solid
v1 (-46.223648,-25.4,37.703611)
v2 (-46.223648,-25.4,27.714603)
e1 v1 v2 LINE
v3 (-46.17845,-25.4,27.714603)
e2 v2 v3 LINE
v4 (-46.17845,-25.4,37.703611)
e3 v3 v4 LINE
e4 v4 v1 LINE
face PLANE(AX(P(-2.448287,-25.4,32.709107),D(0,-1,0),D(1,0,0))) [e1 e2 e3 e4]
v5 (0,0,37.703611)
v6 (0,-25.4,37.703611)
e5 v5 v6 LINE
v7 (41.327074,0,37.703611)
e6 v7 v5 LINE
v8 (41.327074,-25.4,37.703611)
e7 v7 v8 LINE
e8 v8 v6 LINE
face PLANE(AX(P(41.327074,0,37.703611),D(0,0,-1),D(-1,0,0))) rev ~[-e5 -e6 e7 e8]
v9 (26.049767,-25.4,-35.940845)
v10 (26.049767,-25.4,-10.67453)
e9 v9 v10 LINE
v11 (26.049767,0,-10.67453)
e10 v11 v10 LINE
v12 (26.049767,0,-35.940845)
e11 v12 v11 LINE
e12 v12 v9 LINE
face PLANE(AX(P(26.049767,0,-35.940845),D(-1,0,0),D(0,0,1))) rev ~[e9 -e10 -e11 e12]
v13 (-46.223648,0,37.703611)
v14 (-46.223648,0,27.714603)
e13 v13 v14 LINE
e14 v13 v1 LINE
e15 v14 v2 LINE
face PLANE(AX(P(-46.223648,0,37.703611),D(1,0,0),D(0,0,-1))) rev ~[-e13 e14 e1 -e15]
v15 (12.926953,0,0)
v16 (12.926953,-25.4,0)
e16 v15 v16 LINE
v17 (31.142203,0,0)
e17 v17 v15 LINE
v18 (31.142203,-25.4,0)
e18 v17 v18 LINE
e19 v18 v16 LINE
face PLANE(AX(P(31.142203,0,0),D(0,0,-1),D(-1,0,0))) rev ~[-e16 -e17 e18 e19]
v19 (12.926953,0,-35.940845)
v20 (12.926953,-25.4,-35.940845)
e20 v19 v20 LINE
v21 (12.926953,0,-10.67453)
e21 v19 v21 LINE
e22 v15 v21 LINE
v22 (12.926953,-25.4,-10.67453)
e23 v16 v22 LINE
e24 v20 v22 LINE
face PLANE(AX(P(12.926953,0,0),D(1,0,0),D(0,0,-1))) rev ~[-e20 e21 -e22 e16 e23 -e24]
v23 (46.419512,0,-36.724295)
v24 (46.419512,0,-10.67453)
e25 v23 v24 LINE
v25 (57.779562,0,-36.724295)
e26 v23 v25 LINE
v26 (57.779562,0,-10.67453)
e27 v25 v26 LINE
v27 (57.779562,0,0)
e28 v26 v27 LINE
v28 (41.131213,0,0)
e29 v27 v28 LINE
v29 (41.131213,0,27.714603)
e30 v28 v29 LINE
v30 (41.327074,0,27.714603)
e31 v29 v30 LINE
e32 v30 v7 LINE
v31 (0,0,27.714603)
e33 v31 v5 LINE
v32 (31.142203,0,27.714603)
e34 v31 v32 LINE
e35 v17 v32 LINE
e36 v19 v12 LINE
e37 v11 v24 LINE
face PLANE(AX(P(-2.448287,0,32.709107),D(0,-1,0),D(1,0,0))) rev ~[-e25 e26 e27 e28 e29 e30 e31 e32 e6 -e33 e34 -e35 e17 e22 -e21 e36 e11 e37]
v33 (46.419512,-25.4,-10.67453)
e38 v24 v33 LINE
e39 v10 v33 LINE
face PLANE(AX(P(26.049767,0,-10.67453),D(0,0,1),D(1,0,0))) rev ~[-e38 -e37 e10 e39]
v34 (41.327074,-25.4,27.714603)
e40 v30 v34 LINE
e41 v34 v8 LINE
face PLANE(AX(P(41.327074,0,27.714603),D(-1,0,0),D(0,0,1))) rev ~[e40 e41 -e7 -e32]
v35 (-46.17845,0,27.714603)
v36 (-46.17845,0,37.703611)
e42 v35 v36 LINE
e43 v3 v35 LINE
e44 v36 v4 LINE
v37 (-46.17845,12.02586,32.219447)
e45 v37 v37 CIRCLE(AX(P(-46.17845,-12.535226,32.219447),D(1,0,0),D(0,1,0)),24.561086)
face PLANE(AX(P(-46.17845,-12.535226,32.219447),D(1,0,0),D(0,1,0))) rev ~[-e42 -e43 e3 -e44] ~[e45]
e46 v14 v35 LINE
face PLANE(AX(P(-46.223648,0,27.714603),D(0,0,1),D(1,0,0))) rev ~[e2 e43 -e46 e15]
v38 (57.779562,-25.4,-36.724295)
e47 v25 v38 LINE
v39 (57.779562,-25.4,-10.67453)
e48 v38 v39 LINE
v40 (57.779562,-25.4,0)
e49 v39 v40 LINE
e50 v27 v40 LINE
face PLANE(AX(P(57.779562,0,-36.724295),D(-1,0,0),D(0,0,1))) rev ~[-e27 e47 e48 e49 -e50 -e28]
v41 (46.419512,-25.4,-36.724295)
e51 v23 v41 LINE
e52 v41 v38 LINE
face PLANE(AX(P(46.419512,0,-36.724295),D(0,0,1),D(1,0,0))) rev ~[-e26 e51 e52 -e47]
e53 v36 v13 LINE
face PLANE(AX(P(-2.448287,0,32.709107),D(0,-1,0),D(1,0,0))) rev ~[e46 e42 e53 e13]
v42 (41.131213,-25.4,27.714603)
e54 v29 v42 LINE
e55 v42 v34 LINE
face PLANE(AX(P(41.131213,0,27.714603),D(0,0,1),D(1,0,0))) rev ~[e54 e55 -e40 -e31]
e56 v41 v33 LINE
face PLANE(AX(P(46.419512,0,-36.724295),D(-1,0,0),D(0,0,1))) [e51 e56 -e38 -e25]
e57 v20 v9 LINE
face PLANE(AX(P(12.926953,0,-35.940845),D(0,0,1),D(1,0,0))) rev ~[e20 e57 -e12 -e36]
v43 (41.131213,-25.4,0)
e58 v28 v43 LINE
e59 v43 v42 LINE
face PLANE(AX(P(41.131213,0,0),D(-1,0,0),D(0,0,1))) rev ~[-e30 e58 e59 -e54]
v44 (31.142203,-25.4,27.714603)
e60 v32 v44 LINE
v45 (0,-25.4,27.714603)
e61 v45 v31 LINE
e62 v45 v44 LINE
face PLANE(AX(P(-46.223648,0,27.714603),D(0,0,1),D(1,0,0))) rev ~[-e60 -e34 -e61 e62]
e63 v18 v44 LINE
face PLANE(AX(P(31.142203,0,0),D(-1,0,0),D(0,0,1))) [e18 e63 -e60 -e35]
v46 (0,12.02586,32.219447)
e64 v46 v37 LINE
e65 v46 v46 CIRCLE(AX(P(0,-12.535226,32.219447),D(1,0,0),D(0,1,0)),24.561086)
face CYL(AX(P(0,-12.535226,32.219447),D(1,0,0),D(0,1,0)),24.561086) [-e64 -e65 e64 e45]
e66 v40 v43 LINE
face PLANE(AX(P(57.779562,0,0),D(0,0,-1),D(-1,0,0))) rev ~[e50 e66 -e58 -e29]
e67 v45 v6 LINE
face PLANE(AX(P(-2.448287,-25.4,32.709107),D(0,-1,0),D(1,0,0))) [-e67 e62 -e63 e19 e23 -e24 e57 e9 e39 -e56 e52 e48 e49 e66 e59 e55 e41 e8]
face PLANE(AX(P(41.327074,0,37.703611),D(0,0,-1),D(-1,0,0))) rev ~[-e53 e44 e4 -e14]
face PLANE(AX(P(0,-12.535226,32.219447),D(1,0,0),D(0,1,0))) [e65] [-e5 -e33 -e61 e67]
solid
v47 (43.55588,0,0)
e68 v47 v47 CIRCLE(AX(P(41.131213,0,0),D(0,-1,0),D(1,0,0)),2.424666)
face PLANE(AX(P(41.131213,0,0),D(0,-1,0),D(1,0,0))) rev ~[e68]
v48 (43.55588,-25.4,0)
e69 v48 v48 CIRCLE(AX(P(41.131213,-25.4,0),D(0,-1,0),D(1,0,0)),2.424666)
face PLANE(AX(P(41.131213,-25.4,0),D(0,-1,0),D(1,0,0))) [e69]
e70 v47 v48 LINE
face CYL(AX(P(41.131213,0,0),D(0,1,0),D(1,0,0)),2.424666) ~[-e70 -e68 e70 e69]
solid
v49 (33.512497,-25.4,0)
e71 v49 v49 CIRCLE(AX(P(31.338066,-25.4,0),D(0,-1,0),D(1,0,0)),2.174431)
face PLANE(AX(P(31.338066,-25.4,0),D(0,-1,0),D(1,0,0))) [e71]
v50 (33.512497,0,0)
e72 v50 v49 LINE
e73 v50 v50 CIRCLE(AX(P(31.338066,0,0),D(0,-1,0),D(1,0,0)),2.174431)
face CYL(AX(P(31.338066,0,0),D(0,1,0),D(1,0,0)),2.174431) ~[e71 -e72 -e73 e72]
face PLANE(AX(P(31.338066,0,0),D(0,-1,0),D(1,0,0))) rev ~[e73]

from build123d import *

# Parameters (mm, degrees)
F0_W     = 9.9890101701
F0_H     = 27.7146026492
F0_W_2   = 13.1228137761
F0_H_2   = 25.2663148567
F0_W_3   = 11.3600492477
F0_H_3   = 26.0497657582
F2_DEPTH = 25.4
F1_R     = 2.4246663919
F1_R_2   = 2.1744313886
F4_R     = 24.5610859867
F5_DEPTH = 46.17845


# Not quite as in the source:
# - a feature of the source that left no trace in its solid (it failed there, or was rolled back) is left out


with BuildPart() as f2:
    # F0 (on Front) → F2 (new body)
    with BuildSketch(Plane.XZ):
        Polygon((41.3270741701, 37.7036109567), (-46.2236478925, 37.7036109567), (-46.2236478925, 27.7146026492), (31.1422031373, 27.7146026492), (41.1312133074, 27.7146026492), (41.3270741701, 27.7146026492), align=None)
        with Locations((36.1367082223, 13.8573013246)):
            Rectangle(F0_W, F0_H)
        Polygon((41.1312133074, 0), (31.1422031373, 0), (12.9269529134, 0), (12.9269529134, -10.6745297089), (26.0497666895, -10.6745297089), (46.4195124805, -10.6745297089), (57.7795617282, -10.6745297089), (57.7795617282, 0), align=None)
        with Locations((19.4883598015, -23.3076871373)):
            Rectangle(F0_W_2, F0_H_2)
        with Locations((52.0995371044, -23.699412588)):
            Rectangle(F0_W_3, F0_H_3)
    extrude(amount=F2_DEPTH)

    # F4 (on Right) → F5 (join)
    with BuildSketch(Plane.YZ):
        with Locations((-12.5352256, 32.2194471955)):
            Circle(F4_R)
    extrude(amount=-F5_DEPTH)


with BuildPart() as f2b:
    # F1 (on Front) → F2, piece 2 (new body)
    with BuildSketch(Plane.XZ):
        with Locations((41.1312133074, 0)):
            Circle(F1_R)
    extrude(amount=F2_DEPTH)


with BuildPart() as f2c:
    # F1 (on Front) → F2, piece 3 (new body)
    with BuildSketch(Plane.XZ):
        with Locations((31.3380658627, 0)):
            Circle(F1_R_2)
    extrude(amount=F2_DEPTH)


solid = Compound([f2.part, f2b.part, f2c.part])
